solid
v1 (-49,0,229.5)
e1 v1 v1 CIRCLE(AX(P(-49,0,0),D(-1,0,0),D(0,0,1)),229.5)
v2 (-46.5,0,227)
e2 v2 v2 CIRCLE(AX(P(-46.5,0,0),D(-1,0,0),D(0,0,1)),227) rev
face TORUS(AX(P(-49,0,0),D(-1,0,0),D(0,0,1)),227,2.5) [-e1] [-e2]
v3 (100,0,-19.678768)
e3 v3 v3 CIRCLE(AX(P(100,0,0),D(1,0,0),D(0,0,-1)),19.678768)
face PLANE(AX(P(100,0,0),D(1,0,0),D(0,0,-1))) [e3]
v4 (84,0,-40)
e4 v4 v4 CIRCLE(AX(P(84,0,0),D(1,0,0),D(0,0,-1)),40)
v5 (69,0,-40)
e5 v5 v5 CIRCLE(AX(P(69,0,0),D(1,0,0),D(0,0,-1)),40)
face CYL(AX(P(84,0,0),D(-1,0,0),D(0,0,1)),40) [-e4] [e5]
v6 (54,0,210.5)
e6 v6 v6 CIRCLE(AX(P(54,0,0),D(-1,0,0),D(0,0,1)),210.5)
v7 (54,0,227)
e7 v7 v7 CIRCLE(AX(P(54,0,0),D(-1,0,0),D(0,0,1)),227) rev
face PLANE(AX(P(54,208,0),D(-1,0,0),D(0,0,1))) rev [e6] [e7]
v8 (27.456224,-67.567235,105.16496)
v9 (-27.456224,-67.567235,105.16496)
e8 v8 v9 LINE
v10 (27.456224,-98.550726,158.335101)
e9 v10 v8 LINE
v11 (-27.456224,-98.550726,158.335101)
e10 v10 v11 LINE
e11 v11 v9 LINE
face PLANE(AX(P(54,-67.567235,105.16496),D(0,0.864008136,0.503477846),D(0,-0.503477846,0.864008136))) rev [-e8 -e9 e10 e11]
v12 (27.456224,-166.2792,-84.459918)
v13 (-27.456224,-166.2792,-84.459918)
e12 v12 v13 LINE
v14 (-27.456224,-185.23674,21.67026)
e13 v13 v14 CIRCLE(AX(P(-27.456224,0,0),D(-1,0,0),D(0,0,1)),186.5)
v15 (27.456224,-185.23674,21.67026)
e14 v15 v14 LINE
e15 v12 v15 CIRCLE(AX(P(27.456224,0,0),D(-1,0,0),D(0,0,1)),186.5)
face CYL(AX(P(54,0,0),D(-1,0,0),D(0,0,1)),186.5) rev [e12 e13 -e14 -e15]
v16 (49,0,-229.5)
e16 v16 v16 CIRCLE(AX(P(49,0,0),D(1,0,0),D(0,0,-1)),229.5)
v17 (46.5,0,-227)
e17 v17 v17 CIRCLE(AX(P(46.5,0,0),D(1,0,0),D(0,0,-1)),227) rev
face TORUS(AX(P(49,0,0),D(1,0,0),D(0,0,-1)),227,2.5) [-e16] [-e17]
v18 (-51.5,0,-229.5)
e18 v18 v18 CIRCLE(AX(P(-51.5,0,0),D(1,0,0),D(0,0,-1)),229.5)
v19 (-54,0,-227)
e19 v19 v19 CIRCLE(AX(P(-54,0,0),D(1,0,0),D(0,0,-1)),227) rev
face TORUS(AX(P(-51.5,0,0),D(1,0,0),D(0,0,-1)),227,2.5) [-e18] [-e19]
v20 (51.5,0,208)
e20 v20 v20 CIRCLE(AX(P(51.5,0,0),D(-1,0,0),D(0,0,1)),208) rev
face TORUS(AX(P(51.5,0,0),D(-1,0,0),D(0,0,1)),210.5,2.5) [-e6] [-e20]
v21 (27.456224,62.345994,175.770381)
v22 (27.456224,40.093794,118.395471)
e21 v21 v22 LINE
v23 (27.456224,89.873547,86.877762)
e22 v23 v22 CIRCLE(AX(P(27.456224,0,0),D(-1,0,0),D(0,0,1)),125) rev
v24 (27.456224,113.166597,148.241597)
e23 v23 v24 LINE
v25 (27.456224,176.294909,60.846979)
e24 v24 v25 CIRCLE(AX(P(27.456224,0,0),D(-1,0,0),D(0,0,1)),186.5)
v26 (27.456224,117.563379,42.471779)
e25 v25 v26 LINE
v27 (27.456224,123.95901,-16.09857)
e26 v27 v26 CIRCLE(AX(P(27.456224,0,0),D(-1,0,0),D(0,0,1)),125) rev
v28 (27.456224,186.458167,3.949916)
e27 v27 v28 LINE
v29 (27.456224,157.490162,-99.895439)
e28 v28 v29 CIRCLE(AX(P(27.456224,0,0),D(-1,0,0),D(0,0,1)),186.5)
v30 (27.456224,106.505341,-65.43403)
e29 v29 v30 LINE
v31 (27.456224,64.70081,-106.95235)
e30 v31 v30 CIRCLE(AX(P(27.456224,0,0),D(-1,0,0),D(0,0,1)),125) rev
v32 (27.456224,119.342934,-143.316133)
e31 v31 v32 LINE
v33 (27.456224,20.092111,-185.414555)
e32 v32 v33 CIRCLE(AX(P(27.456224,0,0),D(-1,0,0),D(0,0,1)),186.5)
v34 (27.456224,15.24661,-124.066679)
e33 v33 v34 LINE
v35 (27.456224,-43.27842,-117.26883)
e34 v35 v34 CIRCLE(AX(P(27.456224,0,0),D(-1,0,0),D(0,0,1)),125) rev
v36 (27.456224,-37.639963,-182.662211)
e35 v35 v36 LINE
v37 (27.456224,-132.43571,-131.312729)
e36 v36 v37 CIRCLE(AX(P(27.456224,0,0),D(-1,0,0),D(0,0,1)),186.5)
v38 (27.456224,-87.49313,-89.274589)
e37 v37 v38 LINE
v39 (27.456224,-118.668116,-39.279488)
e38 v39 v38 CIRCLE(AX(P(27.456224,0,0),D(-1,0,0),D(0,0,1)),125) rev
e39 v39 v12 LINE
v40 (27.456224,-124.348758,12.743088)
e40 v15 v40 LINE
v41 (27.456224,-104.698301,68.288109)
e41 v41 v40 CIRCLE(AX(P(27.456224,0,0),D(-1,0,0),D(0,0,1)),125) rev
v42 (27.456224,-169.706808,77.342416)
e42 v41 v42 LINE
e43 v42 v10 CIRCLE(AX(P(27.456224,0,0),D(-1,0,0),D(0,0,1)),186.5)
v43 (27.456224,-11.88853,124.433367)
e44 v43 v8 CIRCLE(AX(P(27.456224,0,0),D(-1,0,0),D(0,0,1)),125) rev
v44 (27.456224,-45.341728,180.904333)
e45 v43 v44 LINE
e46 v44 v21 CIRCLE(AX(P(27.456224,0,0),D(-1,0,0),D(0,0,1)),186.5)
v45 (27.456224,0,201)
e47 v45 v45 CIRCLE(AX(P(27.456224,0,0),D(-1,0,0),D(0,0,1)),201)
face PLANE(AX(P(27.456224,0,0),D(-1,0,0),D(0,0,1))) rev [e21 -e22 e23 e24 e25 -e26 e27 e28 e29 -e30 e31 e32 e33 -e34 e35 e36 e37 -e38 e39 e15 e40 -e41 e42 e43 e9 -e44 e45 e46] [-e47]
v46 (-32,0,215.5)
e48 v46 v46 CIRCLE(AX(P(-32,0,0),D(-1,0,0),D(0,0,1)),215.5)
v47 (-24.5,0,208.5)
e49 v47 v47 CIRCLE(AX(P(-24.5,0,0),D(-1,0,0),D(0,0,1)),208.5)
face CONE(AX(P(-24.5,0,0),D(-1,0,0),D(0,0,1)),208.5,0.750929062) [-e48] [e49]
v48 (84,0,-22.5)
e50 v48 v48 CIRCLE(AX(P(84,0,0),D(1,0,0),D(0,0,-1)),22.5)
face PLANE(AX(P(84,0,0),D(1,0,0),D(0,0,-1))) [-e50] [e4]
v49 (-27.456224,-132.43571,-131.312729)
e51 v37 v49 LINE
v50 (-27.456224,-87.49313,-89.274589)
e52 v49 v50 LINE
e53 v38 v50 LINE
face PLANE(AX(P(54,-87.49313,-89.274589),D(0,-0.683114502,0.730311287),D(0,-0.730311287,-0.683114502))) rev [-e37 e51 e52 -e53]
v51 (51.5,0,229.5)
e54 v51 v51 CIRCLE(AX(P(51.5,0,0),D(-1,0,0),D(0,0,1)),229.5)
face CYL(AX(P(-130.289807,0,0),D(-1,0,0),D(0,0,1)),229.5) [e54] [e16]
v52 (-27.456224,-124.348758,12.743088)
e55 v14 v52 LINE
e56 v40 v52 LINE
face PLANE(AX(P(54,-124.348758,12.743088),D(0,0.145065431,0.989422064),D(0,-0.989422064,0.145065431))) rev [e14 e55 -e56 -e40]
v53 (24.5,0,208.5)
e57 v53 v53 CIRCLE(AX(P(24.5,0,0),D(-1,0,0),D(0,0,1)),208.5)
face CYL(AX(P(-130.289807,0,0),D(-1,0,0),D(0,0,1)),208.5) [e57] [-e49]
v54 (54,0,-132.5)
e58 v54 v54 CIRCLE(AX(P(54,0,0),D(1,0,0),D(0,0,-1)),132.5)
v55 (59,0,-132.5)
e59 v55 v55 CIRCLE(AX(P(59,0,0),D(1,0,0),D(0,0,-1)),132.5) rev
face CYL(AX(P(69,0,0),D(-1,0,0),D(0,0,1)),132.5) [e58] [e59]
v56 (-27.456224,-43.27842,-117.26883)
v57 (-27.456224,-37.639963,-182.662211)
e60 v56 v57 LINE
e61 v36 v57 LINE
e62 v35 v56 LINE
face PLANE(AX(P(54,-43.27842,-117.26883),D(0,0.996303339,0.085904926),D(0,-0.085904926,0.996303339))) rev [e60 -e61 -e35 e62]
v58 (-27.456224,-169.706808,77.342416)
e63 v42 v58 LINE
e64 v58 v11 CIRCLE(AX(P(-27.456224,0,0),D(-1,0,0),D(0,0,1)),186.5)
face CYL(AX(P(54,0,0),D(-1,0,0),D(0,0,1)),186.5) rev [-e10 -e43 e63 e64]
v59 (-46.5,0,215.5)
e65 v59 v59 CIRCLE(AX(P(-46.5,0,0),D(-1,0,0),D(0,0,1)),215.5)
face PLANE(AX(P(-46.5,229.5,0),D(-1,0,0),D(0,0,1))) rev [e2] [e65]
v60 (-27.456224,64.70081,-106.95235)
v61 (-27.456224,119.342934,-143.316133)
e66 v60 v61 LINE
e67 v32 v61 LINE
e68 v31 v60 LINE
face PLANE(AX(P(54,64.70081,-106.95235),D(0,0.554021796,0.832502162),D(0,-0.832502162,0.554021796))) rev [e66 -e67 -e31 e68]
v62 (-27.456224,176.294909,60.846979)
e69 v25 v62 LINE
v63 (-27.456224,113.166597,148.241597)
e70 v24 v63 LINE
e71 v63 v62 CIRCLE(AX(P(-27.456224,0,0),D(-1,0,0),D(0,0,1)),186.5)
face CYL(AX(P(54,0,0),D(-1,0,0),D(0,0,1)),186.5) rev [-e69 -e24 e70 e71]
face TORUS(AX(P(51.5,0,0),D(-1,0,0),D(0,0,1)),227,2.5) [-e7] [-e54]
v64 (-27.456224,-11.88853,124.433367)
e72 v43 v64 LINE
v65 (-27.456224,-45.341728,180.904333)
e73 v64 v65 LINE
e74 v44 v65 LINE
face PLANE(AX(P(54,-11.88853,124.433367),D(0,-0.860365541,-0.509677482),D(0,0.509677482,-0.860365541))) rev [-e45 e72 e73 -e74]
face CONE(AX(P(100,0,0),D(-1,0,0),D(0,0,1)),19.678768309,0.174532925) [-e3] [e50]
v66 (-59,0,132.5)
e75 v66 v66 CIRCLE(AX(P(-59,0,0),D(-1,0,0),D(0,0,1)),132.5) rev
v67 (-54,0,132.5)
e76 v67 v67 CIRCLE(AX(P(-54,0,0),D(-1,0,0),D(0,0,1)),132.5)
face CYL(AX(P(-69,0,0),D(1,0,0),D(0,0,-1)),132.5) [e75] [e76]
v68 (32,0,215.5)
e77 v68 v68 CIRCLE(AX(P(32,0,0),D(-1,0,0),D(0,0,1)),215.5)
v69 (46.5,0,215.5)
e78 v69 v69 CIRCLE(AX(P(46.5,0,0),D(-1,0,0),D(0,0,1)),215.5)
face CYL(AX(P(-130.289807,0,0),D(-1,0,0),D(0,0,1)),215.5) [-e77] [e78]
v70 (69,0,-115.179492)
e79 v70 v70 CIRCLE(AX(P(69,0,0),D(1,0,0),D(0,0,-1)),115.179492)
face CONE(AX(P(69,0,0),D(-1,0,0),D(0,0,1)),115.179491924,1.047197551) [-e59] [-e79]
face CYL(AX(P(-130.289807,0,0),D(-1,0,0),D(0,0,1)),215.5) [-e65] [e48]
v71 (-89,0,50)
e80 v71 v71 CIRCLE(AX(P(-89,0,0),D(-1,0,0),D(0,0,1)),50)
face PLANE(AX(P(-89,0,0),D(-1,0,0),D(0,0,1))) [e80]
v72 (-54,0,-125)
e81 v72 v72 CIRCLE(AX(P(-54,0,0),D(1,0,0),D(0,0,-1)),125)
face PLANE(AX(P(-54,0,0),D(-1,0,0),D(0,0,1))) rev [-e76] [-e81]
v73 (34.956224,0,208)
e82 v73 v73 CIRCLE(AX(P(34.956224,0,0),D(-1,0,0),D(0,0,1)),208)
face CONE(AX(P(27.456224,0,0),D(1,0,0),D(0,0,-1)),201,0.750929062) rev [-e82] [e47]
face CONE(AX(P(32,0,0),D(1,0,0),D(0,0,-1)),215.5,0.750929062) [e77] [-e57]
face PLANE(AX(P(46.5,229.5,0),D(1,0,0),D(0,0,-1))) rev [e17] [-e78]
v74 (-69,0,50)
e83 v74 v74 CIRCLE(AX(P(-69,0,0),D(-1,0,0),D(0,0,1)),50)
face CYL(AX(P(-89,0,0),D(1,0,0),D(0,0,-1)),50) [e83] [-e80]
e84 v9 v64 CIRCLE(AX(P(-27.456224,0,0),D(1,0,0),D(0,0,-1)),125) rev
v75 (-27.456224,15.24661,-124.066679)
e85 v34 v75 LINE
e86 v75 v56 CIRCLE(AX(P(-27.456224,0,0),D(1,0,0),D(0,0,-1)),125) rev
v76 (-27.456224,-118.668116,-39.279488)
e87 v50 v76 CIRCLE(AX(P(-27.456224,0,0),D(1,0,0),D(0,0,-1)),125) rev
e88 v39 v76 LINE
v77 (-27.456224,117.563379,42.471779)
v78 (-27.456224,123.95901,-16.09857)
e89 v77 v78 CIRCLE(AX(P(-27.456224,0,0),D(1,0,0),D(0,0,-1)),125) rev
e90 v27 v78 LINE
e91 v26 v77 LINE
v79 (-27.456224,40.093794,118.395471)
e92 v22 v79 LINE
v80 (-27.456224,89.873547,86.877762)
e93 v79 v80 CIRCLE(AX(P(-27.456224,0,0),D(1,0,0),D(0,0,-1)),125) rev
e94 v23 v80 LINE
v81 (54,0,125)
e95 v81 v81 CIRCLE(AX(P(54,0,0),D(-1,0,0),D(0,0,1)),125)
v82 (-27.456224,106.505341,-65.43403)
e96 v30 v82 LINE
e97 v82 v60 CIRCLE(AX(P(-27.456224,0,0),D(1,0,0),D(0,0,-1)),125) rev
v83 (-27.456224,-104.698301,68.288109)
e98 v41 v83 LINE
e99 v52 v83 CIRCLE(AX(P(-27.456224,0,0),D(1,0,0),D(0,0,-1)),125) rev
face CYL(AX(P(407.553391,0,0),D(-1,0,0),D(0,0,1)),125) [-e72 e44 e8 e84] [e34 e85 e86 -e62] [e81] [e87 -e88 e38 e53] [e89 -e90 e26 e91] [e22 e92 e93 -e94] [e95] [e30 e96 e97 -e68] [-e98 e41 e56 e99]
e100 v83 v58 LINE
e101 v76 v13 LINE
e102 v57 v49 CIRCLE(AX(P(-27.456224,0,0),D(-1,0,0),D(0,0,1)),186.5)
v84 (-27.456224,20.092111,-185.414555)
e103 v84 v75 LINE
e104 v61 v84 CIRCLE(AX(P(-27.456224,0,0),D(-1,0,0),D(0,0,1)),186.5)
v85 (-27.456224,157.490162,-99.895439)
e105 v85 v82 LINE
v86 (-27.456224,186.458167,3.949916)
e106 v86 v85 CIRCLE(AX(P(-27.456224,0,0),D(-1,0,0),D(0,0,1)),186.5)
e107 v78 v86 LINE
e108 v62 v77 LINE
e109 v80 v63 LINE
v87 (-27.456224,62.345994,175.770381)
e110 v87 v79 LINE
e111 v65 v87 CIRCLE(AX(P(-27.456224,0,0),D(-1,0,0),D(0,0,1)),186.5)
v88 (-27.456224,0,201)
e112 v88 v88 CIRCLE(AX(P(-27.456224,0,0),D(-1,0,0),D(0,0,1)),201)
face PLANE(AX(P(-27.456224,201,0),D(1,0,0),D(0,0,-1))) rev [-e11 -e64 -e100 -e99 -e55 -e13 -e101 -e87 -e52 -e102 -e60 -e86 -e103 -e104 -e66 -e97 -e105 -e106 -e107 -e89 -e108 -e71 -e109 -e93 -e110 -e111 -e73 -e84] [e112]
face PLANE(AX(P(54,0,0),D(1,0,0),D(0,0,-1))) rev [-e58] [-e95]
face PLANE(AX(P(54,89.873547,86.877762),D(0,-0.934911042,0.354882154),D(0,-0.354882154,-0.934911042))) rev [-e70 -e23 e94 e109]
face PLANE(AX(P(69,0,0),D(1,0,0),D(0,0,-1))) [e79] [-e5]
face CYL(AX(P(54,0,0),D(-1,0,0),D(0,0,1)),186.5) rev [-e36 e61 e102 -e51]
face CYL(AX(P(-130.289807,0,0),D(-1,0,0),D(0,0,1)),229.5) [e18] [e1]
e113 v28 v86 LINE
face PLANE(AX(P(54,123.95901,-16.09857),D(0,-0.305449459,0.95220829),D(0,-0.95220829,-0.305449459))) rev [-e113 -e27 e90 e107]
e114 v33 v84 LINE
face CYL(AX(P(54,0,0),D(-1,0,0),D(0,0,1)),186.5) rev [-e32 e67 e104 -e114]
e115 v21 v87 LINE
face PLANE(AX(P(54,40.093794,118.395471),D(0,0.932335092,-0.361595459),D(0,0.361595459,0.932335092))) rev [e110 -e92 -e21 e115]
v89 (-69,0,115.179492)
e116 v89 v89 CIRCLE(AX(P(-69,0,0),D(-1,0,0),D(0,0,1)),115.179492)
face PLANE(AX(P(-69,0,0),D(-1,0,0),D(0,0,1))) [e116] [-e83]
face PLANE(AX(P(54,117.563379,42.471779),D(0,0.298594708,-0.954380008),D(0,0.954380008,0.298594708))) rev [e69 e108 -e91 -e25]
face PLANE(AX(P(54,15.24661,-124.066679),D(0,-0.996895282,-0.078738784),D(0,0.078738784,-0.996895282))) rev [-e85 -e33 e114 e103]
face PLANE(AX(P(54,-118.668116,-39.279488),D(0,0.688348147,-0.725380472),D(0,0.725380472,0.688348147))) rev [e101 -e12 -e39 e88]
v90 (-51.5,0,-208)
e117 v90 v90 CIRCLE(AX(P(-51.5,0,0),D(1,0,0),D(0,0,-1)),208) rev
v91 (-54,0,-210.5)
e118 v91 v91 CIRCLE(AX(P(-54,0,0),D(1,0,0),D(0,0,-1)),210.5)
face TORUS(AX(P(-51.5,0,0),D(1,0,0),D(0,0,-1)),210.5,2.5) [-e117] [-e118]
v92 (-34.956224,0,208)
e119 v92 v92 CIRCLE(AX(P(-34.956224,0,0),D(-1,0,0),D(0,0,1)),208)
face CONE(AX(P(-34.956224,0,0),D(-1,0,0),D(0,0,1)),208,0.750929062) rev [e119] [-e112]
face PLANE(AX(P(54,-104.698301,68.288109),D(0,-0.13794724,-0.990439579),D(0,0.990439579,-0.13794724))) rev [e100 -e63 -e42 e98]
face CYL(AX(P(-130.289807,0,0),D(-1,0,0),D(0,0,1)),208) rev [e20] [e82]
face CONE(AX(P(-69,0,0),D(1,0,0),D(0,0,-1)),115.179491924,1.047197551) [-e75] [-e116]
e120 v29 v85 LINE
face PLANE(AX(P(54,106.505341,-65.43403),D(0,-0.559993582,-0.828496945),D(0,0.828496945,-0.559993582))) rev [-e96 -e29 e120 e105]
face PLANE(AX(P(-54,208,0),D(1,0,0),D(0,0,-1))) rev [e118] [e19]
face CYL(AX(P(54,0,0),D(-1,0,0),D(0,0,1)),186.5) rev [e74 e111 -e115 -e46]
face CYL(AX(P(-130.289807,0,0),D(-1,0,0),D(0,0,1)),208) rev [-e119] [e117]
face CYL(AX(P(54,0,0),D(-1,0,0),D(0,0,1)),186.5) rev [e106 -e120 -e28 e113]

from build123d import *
from build123d.topology import SkipClean

# Parameters (mm, degrees)
SKETCH5_R           = 125
BOSS_EXTRUDE2_DEPTH = 26.543776145
BOSS_EXTRUDE3_START = 26.543776145
SKETCH6_R           = 125
BOSS_EXTRUDE3_DEPTH = 26.543776145
CUT_EXTRUDE1_DEPTH  = 335.627578667
SKETCH8_R           = 132.5
BOSS_EXTRUDE4_DEPTH = 15
BOSS_EXTRUDE5_START = 15
SKETCH9_R           = 132.5
BOSS_EXTRUDE5_DEPTH = 15
CHAMFER1_SIZE       = 10
CHAMFER1_SIZE2      = 17.320508076
CHAMFER2_SIZE       = 10
CHAMFER2_SIZE2      = 17.320508076
SKETCH10_R          = 40
BOSS_EXTRUDE6_DEPTH = 15
SKETCH11_R          = 50
BOSS_EXTRUDE7_DEPTH = 20
SKETCH12_R          = 22.5
BOSS_EXTRUDE8_DEPTH = 16
CHAMFER3_SIZE2      = 2.821231691
CHAMFER3_SIZE       = 16
FILLET1_R           = 2.5


with BuildPart() as part:
    # Sketch4 → Revolve1 (revolve)
    with BuildSketch(Plane.XY, mode=Mode.PRIVATE) as revolve1_sk:
        Polygon((27.456223855, 201), (34.956223855, 208), (54, 208), (54, 229.5), (46.5, 229.5), (46.5, 215.5), (32, 215.5), (24.5, 208.5), (-24.5, 208.5), (-32, 215.5), (-46.5, 215.5), (-46.5, 229.5), (-54, 229.5), (-54, 208), (-34.956223855, 208), (-27.456223855, 201), (-27.456223855, 0), (27.456223855, 0), align=None)
    revolve(revolve1_sk.sketch.rotate(Axis((-130.289806515, 0, 0), (1, 0, 0)), 90), axis=Axis((-130.289806515, 0, 0), (1, 0, 0)))

    # Sketch5 → Boss-Extrude2 (add)
    with BuildSketch(Plane(origin=(27.456223855, 0, 0), x_dir=(0, 0, -1), z_dir=(1, 0, 0))):
        with Locations(Location((0, 0, 0), (0, 0, 180))):
            Circle(SKETCH5_R)
    extrude(amount=BOSS_EXTRUDE2_DEPTH)

    # Sketch6 → Boss-Extrude3 (add)
    with BuildSketch(Plane.ZY.offset(27.456223855).offset(BOSS_EXTRUDE3_START)):
        Circle(SKETCH6_R)
    extrude(amount=-BOSS_EXTRUDE3_DEPTH)

    # Sketch7 → Cut-Extrude1 (cut, through all)
    with SkipClean():  # the faces are left unmerged after this step: merging them gives an invalid solid
        with BuildSketch(Plane.ZY.offset(27.456223855)):
            with BuildLine():
                Line((42.471778538, 117.56337877), (60.846979295, 176.294909486))
                ThreePointArc((60.846979295, 176.294909486), (109.205330342, 151.183483969), (148.241597448, 113.166597484))
                Line((148.241597448, 113.166597484), (86.877762106, 89.873547006))
                ThreePointArc((86.877762106, 89.873547006), (66.140060569, 106.068338292), (42.471778538, 117.56337877))
            make_face()
            with BuildLine():
                Line((118.395471493, 40.093794157), (175.770381499, 62.345994158))
                ThreePointArc((175.770381499, 62.345994158), (186.288417173, 8.881195149), (180.904332897, -45.341728453))
                Line((180.904332897, -45.341728453), (124.433367172, -11.888529526))
                ThreePointArc((124.433367172, -11.888529526), (124.165219428, 14.42214562), (118.395471493, 40.093794157))
            make_face()
            with BuildLine():
                Line((105.164959586, -67.56723522), (158.335101372, -98.550726397))
                ThreePointArc((158.335101372, -98.550726397), (123.092526281, -140.108814761), (77.342415899, -169.706808063))
                Line((77.342415899, -169.706808063), (68.288108779, -104.698300843))
                ThreePointArc((68.288108779, -104.698300843), (88.69143555, -88.084216862), (105.164959586, -67.56723522))
            make_face()
            with BuildLine():
                Line((12.743088136, -124.348758356), (21.670260464, -185.236739907))
                ThreePointArc((21.670260464, -185.236739907), (-32.79454753, -183.594029457), (-84.459917769, -166.279199813))
                Line((-84.459917769, -166.279199813), (-39.279488348, -118.668116169))
                ThreePointArc((-39.279488348, -118.668116169), (-13.568808273, -124.261367456), (12.743088136, -124.348758356))
            make_face()
            with BuildLine():
                Line((-89.274588592, -87.493130198), (-131.312728566, -132.435710126))
                ThreePointArc((-131.312728566, -132.435710126), (-163.986658164, -88.829195336), (-182.662210688, -37.639962627))
                Line((-182.662210688, -37.639962627), (-117.268829593, -43.278419632))
                ThreePointArc((-117.268829593, -43.278419632), (-105.611462713, -66.867173886), (-89.274588592, -87.493130198))
            make_face()
            with BuildLine():
                Line((-124.06667924, 15.246609534), (-185.414554695, 20.092110576))
                ThreePointArc((-185.414554695, 20.092110576), (-171.693470483, 72.825834658), (-143.316133329, 119.342934133))
                Line((-143.316133329, 119.342934133), (-106.952350307, 64.700809607))
                ThreePointArc((-106.952350307, 64.700809607), (-118.126531649, 40.879365462), (-124.06667924, 15.246609534))
            make_face()
            with BuildLine():
                Line((-65.434029922, 106.505341313), (-99.895439371, 157.49016221))
                ThreePointArc((-99.895439371, 157.49016221), (-50.111597619, 179.641525779), (3.949915543, 186.458167338))
                Line((3.949915543, 186.458167338), (-16.098569809, 123.959009556))
                ThreePointArc((-16.098569809, 123.959009556), (-41.689912911, 117.84290883), (-65.434029922, 106.505341313))
            make_face()
        extrude(amount=-CUT_EXTRUDE1_DEPTH, mode=Mode.SUBTRACT)
    add(part.part.scale(1), mode=Mode.REPLACE)  # the faces are merged on a copy

    # Sketch8 → Boss-Extrude4 (add)
    with BuildSketch(Plane(origin=(54, 0, 0), x_dir=(0, 0, -1), z_dir=(1, 0, 0))):
        Circle(SKETCH8_R)
    extrude(amount=BOSS_EXTRUDE4_DEPTH)

    # Sketch9 → Boss-Extrude5 (add)
    with BuildSketch(Plane.ZY.offset(54).offset(BOSS_EXTRUDE5_START)):
        with Locations(Location((0, 0, 0), (0, 0, 180))):
            Circle(SKETCH9_R)
    extrude(amount=-BOSS_EXTRUDE5_DEPTH)

    # Chamfer1
    chamfer1_edges = [part.edges().sort_by_distance(p)[0] for p in [
        (69, 0, 132.5),
    ]]
    chamfer1_side = [part.faces().sort_by_distance(p)[0] for p in [
        (61.5, 0, 132.5),
    ]]
    chamfer(chamfer1_edges, length=CHAMFER1_SIZE, length2=CHAMFER1_SIZE2, reference=chamfer1_side[0])

    # Chamfer2
    chamfer2_edges = [part.edges().sort_by_distance(p)[0] for p in [
        (-69, 0, 132.5),
    ]]
    chamfer2_side = [part.faces().sort_by_distance(p)[0] for p in [
        (-61.5, 0, 132.5),
    ]]
    chamfer(chamfer2_edges, length=CHAMFER2_SIZE, length2=CHAMFER2_SIZE2, reference=chamfer2_side[0])

    # Sketch10 → Boss-Extrude6 (add)
    with BuildSketch(Plane(origin=(69, 0, 0), x_dir=(0, 0, -1), z_dir=(1, 0, 0))):
        Circle(SKETCH10_R)
    extrude(amount=BOSS_EXTRUDE6_DEPTH)

    # Sketch11 → Boss-Extrude7 (add)
    with BuildSketch(Plane.ZY.offset(69)):
        Circle(SKETCH11_R)
    extrude(amount=BOSS_EXTRUDE7_DEPTH)

    # Sketch12 → Boss-Extrude8 (add)
    with BuildSketch(Plane(origin=(84, 0, 0), x_dir=(0, 0, -1), z_dir=(1, 0, 0))):
        Circle(SKETCH12_R)
    extrude(amount=BOSS_EXTRUDE8_DEPTH)

    # Chamfer3
    chamfer3_edges = [part.edges().sort_by_distance(p)[0] for p in [
        (100, 0, 22.5),
    ]]
    chamfer3_side = [part.faces().sort_by_distance(p)[0] for p in [
        (99.943575366, 0, 22.5),
    ]]
    chamfer(chamfer3_edges, length=CHAMFER3_SIZE - 0.0001, length2=CHAMFER3_SIZE2 - 0.0001, reference=chamfer3_side[0])  # a hair under: the kernel refuses the full size

    # Fillet1
    fillet1_edges = [part.edges().sort_by_distance(p)[0] for p in [
        (-46.5, 0, -229.5),
        (-54, 0, -229.5),
        (-54, 0, -208),
        (54, 0, -208),
        (54, 0, -229.5),
        (46.5, 0, -229.5),
    ]]
    fillet(fillet1_edges, radius=FILLET1_R)


solid = part.part
